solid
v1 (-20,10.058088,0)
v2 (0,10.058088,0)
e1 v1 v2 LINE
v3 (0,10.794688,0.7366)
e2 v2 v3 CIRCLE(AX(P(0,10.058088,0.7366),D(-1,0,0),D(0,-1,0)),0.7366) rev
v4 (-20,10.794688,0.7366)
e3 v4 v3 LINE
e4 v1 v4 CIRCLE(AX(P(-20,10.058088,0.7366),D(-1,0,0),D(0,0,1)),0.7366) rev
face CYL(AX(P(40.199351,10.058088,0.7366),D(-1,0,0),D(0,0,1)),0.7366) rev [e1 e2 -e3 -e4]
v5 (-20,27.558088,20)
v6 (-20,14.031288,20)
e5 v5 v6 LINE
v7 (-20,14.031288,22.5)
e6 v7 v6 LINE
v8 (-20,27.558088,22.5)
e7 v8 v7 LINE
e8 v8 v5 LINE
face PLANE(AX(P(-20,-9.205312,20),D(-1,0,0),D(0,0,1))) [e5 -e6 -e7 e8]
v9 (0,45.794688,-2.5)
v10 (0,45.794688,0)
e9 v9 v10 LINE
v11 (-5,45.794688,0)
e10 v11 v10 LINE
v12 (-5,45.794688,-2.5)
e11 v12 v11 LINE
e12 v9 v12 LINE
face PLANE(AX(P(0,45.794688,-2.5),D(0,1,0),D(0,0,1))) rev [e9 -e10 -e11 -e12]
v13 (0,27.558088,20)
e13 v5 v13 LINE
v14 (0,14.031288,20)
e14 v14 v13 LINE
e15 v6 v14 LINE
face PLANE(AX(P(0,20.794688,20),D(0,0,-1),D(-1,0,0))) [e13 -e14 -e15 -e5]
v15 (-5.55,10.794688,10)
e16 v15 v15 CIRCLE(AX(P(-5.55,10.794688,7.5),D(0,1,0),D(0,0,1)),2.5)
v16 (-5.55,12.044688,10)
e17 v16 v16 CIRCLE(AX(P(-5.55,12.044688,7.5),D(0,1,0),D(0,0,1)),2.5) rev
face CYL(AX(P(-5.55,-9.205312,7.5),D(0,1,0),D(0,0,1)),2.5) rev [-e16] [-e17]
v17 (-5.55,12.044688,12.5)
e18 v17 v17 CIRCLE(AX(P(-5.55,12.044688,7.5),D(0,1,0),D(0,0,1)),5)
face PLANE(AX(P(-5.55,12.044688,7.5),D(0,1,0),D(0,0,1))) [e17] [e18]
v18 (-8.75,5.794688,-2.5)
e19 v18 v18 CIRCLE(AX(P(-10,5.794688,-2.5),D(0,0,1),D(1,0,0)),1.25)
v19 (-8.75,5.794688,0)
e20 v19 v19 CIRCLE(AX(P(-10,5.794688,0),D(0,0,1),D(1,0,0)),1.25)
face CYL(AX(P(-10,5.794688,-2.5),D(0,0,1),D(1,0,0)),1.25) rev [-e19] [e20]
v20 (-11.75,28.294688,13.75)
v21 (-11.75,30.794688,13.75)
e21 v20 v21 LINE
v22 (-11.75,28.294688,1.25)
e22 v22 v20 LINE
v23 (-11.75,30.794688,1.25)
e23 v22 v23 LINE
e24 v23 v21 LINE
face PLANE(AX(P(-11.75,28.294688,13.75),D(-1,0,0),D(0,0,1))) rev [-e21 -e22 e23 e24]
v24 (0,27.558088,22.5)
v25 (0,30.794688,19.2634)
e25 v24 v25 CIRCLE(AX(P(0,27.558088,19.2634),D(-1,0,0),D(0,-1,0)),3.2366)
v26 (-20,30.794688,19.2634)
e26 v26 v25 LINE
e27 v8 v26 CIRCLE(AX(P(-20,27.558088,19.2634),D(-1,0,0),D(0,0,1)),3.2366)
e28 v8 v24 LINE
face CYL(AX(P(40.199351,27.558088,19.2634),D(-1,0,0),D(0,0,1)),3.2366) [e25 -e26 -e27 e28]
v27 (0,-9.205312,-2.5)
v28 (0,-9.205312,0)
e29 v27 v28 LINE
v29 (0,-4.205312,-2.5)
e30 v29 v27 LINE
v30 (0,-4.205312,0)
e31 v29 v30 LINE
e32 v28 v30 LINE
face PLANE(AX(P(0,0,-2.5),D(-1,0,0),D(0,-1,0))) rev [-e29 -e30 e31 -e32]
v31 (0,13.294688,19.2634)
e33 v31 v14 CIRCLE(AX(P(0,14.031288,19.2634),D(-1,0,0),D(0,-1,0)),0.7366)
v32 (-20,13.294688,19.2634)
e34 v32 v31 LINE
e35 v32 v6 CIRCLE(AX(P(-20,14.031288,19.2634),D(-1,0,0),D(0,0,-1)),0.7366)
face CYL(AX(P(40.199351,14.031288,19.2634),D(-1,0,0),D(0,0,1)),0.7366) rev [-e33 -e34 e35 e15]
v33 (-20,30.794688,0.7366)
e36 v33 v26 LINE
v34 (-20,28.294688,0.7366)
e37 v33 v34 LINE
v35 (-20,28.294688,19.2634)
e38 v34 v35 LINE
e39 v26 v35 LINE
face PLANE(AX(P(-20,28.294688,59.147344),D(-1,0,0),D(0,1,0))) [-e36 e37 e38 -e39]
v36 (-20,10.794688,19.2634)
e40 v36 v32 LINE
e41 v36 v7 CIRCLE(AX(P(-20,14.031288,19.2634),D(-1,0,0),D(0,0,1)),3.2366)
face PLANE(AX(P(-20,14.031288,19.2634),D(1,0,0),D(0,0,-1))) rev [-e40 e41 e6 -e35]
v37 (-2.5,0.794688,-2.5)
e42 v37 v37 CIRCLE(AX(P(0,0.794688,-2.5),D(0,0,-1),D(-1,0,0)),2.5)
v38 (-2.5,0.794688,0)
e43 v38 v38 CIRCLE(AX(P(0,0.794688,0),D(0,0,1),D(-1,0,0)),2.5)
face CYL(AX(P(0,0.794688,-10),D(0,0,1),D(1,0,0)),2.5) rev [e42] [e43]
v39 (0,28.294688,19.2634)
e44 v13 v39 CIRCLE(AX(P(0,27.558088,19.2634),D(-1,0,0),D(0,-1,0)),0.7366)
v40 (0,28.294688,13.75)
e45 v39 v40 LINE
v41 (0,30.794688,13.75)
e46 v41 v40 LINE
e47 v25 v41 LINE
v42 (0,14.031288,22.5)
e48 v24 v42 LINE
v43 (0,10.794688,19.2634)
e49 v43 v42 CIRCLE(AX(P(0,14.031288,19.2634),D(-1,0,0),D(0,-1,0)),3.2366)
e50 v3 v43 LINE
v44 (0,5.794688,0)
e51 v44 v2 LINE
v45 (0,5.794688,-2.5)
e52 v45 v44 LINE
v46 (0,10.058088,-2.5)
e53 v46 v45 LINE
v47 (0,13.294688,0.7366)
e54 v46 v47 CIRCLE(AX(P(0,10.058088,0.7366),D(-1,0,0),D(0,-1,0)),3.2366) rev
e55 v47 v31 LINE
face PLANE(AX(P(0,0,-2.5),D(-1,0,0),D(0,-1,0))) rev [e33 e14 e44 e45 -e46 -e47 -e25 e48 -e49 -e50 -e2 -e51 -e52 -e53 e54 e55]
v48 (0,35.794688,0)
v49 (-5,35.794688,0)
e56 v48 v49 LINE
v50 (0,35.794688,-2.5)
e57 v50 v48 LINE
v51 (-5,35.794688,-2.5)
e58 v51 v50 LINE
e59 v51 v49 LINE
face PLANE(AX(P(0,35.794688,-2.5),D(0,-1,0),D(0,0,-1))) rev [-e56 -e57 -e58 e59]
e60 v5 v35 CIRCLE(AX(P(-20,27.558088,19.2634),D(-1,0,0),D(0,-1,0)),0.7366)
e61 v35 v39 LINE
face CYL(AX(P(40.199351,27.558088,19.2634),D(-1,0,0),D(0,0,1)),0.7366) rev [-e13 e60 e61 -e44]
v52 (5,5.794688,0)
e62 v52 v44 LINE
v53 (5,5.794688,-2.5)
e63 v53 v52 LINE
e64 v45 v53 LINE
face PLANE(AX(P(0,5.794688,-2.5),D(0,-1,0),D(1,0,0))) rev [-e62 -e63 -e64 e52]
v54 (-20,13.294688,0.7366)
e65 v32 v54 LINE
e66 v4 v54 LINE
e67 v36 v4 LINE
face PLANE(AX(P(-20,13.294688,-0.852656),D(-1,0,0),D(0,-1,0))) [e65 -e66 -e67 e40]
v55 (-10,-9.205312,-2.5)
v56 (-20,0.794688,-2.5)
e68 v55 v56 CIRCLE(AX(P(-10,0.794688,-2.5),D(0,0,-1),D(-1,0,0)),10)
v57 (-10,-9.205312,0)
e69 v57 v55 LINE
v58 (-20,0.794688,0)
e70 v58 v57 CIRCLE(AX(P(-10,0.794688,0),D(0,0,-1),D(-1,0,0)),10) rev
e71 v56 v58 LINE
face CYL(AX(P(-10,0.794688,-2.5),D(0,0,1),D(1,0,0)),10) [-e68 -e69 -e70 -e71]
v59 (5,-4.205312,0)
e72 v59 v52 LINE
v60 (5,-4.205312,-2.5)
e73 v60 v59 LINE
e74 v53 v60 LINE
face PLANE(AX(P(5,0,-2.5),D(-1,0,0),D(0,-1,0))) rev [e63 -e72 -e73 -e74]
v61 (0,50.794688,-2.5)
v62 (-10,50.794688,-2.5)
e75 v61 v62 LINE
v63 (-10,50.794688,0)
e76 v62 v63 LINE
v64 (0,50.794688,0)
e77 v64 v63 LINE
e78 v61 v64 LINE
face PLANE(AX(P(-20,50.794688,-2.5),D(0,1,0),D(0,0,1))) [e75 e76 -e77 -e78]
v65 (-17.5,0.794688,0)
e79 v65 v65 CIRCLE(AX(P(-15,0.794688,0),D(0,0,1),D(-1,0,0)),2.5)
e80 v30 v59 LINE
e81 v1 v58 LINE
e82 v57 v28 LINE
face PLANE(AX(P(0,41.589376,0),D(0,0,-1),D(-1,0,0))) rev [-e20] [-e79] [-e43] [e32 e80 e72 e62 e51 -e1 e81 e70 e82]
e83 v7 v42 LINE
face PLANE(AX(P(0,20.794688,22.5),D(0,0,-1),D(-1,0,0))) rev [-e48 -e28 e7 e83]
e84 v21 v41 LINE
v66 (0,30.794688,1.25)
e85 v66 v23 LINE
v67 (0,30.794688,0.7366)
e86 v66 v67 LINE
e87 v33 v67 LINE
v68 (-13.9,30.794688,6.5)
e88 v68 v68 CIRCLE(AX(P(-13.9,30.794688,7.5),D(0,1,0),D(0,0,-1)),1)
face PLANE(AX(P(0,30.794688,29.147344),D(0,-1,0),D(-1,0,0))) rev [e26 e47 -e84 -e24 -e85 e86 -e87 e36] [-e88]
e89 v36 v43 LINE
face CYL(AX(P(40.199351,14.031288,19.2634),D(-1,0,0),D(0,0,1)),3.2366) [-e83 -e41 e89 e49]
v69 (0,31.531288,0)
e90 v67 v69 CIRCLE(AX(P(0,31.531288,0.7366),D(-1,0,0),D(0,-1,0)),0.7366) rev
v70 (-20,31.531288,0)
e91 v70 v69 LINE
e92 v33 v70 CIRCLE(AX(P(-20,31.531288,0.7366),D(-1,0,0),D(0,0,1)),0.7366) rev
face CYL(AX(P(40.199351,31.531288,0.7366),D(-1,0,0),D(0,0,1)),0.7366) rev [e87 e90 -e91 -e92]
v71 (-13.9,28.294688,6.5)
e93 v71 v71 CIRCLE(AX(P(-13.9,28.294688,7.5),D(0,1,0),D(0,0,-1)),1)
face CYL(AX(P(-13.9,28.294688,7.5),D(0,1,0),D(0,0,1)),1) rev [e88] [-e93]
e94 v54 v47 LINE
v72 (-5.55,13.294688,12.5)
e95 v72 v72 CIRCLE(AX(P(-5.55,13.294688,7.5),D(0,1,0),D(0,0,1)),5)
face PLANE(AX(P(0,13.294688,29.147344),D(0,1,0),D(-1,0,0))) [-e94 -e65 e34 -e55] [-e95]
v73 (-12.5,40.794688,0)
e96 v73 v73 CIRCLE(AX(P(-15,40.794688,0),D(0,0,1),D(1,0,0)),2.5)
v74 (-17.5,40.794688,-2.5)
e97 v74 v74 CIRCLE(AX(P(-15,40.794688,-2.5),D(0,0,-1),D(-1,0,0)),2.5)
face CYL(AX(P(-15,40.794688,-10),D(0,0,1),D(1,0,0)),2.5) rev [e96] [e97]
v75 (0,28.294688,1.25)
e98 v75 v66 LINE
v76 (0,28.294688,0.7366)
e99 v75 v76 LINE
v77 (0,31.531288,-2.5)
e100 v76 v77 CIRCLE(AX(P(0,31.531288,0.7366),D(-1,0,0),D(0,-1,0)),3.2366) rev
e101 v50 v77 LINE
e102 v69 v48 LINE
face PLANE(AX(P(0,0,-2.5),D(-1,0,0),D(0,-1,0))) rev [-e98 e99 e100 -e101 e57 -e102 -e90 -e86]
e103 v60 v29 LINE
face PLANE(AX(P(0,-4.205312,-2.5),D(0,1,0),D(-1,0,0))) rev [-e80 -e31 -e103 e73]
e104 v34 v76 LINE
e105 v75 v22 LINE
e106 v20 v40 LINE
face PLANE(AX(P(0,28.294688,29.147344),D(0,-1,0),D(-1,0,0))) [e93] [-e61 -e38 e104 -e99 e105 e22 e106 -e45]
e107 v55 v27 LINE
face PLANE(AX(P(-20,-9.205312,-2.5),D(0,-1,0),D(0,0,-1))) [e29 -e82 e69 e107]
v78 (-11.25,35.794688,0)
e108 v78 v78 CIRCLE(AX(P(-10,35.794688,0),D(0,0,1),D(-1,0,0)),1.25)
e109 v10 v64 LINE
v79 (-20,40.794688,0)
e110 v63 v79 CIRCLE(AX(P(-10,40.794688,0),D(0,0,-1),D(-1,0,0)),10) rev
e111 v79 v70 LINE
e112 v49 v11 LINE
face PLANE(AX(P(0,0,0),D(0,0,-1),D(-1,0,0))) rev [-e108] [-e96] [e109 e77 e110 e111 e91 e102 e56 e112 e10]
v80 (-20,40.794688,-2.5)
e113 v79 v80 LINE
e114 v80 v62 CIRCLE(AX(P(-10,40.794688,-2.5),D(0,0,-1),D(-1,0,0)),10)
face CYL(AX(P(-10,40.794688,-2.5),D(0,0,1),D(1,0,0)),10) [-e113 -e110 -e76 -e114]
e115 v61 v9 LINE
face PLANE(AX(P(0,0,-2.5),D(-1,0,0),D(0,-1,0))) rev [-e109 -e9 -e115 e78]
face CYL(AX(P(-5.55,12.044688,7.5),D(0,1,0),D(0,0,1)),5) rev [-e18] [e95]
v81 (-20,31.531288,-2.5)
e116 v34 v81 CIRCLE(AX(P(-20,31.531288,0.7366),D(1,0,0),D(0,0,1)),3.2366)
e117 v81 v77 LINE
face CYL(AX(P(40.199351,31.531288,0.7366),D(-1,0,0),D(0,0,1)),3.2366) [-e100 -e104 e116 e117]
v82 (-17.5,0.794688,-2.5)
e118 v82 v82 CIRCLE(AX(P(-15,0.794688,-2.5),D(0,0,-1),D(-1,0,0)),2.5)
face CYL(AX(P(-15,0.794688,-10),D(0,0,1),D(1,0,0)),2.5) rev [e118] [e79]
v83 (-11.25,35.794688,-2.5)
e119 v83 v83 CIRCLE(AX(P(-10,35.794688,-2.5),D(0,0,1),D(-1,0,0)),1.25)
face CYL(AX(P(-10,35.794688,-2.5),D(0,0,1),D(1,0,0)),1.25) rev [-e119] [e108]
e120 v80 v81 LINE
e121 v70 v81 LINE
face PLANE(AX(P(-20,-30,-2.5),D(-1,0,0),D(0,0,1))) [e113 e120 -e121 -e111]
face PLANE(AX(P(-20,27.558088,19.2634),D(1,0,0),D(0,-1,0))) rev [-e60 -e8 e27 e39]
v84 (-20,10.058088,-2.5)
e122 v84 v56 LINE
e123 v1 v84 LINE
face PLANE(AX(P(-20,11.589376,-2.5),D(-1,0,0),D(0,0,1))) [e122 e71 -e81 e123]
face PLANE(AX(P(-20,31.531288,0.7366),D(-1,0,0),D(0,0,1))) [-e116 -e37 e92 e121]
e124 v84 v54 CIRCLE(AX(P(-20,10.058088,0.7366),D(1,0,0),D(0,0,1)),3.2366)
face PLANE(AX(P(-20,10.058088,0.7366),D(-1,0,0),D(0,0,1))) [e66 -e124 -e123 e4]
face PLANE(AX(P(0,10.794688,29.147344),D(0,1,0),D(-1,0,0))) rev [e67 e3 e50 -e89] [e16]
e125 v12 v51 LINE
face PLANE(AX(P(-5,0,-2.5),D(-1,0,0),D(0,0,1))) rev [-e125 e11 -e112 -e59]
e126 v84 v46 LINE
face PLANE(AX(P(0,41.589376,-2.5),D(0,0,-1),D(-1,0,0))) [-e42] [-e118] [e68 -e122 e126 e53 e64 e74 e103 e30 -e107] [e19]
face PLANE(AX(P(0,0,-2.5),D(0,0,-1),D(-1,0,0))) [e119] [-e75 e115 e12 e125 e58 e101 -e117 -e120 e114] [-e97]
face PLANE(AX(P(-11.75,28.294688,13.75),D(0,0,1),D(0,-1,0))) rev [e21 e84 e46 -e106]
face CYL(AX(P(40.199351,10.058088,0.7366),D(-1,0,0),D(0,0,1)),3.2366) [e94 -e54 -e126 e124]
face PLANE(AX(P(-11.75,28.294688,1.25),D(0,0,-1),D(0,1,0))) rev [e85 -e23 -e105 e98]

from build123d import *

# Parameters (mm, degrees)
SKETCH1_W           = 40
SKETCH1_H           = 60
SKETCH1_R           = 1.25
BASE_FLANGE1_DEPTH  = 2.5
SKETCH15_R          = 1
CUT_EXTRUDE3_DEPTH  = 10
JOG3_START          = -2.5
JOG3_OUTLINE_W      = 40
JOG3_OUTLINE_H      = 58.294687966
JOG3_OUTLINE_R      = 1
JOG3_OUTLINE_R_2    = 1.25
JOG3_DEPTH          = 2.5
JOG3_2_OUTLINE_W    = 40
JOG3_2_OUTLINE_H    = 1.705312034
JOG3_2_DEPTH        = 0.332528284
JOG3_START_2        = 19.2634
JOG3_3_OUTLINE_W    = 40
JOG3_3_OUTLINE_H    = 40
JOG3_3_OUTLINE_R    = 1
JOG3_3_OUTLINE_R_2  = 1.25
JOG3_3_DEPTH        = 3.2366
JOG3_4_OUTLINE_W    = 40
JOG3_4_OUTLINE_H    = 20.794687966
JOG3_4_OUTLINE_R    = 1.25
JOG3_4_DEPTH        = 3.2366
JOG3_5_OUTLINE_W    = 40
JOG3_5_OUTLINE_H    = 2.5
JOG3_5_DEPTH        = 20
JOG3_START_3        = 20
JOG3_6_OUTLINE_R    = 1.25
JOG3_6_OUTLINE_R_2  = 1
JOG3_6_DEPTH        = 2.5
JOG3_START_4        = -20
JOG3_7_DEPTH        = 40
JOG4_START          = -20
JOG4_DEPTH          = 40
JOG4_2_DEPTH        = 40
JOG4_START_2        = -3
JOG4_3_OUTLINE_R    = 1.25
JOG4_3_DEPTH        = 4
FILLET1_R           = 10
SKETCH18_R          = 2.5
BOSS_EXTRUDE1_DEPTH = 2.5
SKETCH19_R          = 1
SKETCH19_W          = 23.5
SKETCH19_H          = 12.5
CUT_EXTRUDE4_DEPTH  = 2.5
SKETCH20_R          = 2.5
CUT_EXTRUDE6_DEPTH  = 10
SKETCH23_R          = 2.5
CUT_EXTRUDE7_DEPTH  = 51.062460986
SKETCH24_R          = 5
CUT_EXTRUDE8_DEPTH  = 1.25
SKETCH26_R          = 2.5
CUT_EXTRUDE12_DEPTH = 51.062460987
SKETCH27_W          = 20
SKETCH27_H          = 13.5268
CUT_EXTRUDE13_DEPTH = 61.042487703


with BuildPart() as part:
    # Base-Flange1: sheet metal written as solids
    # Sketch1 → Base-Flange1 (new body)
    with BuildSketch(Plane.XY):
        Rectangle(SKETCH1_W, SKETCH1_H)
        with Locations((10, 15)):
            Circle(SKETCH1_R, mode=Mode.SUBTRACT)
        with Locations(Location((10, -15, 0), (0, 0, 180))):
            Circle(SKETCH1_R, mode=Mode.SUBTRACT)
        with Locations((-10, -15)):
            Circle(SKETCH1_R, mode=Mode.SUBTRACT)
        with Locations(Location((-10, 15, 0), (0, 0, 180))):
            Circle(SKETCH1_R, mode=Mode.SUBTRACT)
    extrude(amount=-BASE_FLANGE1_DEPTH)

    # Sketch15 → Cut-Extrude3 (cut)
    with BuildSketch(Plane.XY):
        with Locations((12, 0)):
            Circle(SKETCH15_R)
        with Locations(Location((-17, 0, 0), (0, 0, 180))):
            Circle(SKETCH15_R)
    extrude(amount=-CUT_EXTRUDE3_DEPTH, mode=Mode.SUBTRACT)

    # Jog3: read off the stored shape, not the designer's step
    # Jog3 outline → Jog3 (cut)
    with BuildSketch(Plane.XY.offset(JOG3_START)):
        with Locations((0, -0.852656017)):
            Rectangle(JOG3_OUTLINE_W, JOG3_OUTLINE_H)
        with Locations((-17, 0)):
            Circle(JOG3_OUTLINE_R, mode=Mode.SUBTRACT)
        with Locations((12, 0)):
            Circle(JOG3_OUTLINE_R, mode=Mode.SUBTRACT)
        with Locations((-10, 15)):
            Circle(JOG3_OUTLINE_R_2, mode=Mode.SUBTRACT)
        with Locations((10, 15)):
            Circle(JOG3_OUTLINE_R_2, mode=Mode.SUBTRACT)
        with Locations((10, -15)):
            Circle(JOG3_OUTLINE_R_2, mode=Mode.SUBTRACT)
        with Locations((-10, -15)):
            Circle(JOG3_OUTLINE_R_2, mode=Mode.SUBTRACT)
    extrude(amount=JOG3_DEPTH, mode=Mode.SUBTRACT)

    # Jog3 2 outline → Jog3 2 (cut)
    with BuildSketch(Plane.XY.offset(JOG3_START)):
        with Locations((0, 29.147343983)):
            Rectangle(JOG3_2_OUTLINE_W, JOG3_2_OUTLINE_H)
    extrude(amount=JOG3_2_DEPTH, mode=Mode.SUBTRACT)

    # Jog3 4 outline → Jog3 4 (add)
    with BuildSketch(Plane.XY.offset(JOG3_START)):
        with Locations((0, 40.397343983)):
            Rectangle(JOG3_4_OUTLINE_W, JOG3_4_OUTLINE_H)
        with Locations((10, 35.794687966)):
            Circle(JOG3_4_OUTLINE_R, mode=Mode.SUBTRACT)
        with Locations((-10, 35.794687966)):
            Circle(JOG3_4_OUTLINE_R, mode=Mode.SUBTRACT)
    extrude(amount=JOG3_4_DEPTH)



with BuildPart() as body_2:
    # Jog3 3 outline → Jog3 3 (new body)
    with BuildSketch(Plane.XY.offset(JOG3_START_2)):
        with Locations((0, 10.794687966)):
            Rectangle(JOG3_3_OUTLINE_W, JOG3_3_OUTLINE_H)
        with Locations((12, 20.794687966)):
            Circle(JOG3_3_OUTLINE_R, mode=Mode.SUBTRACT)
        with Locations((-17, 0)):
            Circle(JOG3_3_OUTLINE_R, mode=Mode.SUBTRACT)
        with Locations((-10, 5.794687966)):
            Circle(JOG3_3_OUTLINE_R_2, mode=Mode.SUBTRACT)
        with Locations((12, 0)):
            Circle(JOG3_3_OUTLINE_R, mode=Mode.SUBTRACT)
        with Locations((10, 5.794687966)):
            Circle(JOG3_3_OUTLINE_R_2, mode=Mode.SUBTRACT)
        with Locations((-17, 20.794687966)):
            Circle(JOG3_3_OUTLINE_R, mode=Mode.SUBTRACT)
        with Locations((-10, 15)):
            Circle(JOG3_3_OUTLINE_R_2, mode=Mode.SUBTRACT)
        with Locations((10, 15)):
            Circle(JOG3_3_OUTLINE_R_2, mode=Mode.SUBTRACT)
    extrude(amount=JOG3_3_DEPTH)


with BuildPart() as part_1:
    add(part.part)

    add(body_2.part)  # Jog3 5 merges body 2
    # Jog3 5 outline → Jog3 5 (add)
    with BuildSketch(Plane.XY):
        with Locations((0, 29.544687966)):
            Rectangle(JOG3_5_OUTLINE_W, JOG3_5_OUTLINE_H)
    extrude(amount=JOG3_5_DEPTH)

    # Jog3 6 outline → Jog3 6 (add)
    with BuildSketch(Plane.XY.offset(JOG3_START_3)):
        with Locations((10, 15)):
            Circle(JOG3_6_OUTLINE_R)
        with Locations((-10, 15)):
            Circle(JOG3_6_OUTLINE_R)
        with Locations((12, 0)):
            Circle(JOG3_6_OUTLINE_R_2)
        with Locations((-17, 0)):
            Circle(JOG3_6_OUTLINE_R_2)
    extrude(amount=JOG3_6_DEPTH)

    # Jog3 7 outline → Jog3 7 (cut)
    with BuildSketch(Plane.YZ.offset(JOG3_START_4)):
        with BuildLine():
            ThreePointArc((28.294687966, 19.2634), (28.078942821, 19.784254855), (27.558087966, 20))
            Line((27.558087966, 20), (-9.205312034, 20))
            Line((-9.205312034, 20), (-9.205312034, 19.2634))
            Line((-9.205312034, 19.2634), (28.294687966, 19.2634))
        make_face()
        with BuildLine():
            ThreePointArc((31.531287966, -2.5), (29.242666158, -1.552021808), (28.294687966, 0.7366))
            Line((28.294687966, 0.7366), (28.294687966, -2.167471716))
            Line((28.294687966, -2.167471716), (30, -2.167471716))
            Line((30, -2.167471716), (30, -2.5))
            Line((30, -2.5), (31.531287966, -2.5))
        make_face()
        with BuildLine():
            Line((31.531287966, 0), (50.794687966, 0))
            Line((50.794687966, 0), (50.794687966, 0.7366))
            Line((50.794687966, 0.7366), (30.794687966, 0.7366))
            ThreePointArc((30.794687966, 0.7366), (31.010433111, 0.215745145), (31.531287966, 0))
        make_face()
        with BuildLine():
            Line((30.794687966, 22.5), (27.558087966, 22.5))
            ThreePointArc((27.558087966, 22.5), (29.846709774, 21.552021808), (30.794687966, 19.2634))
            Line((30.794687966, 19.2634), (30.794687966, 22.5))
        make_face()
    extrude(amount=JOG3_7_DEPTH, mode=Mode.SUBTRACT)

    # Jog4: read off the stored shape, not the designer's step
    # Jog4 outline → Jog4 (cut)
    with BuildSketch(Plane.YZ.offset(JOG4_START)):
        with BuildLine():
            Line((-9.205312034, 20), (10.87962174, 20))
            ThreePointArc((10.87962174, 20), (12.019882984, 21.799110859), (14.031287966, 22.5))
            Line((14.031287966, 22.5), (-9.205312034, 22.5))
            Line((-9.205312034, 22.5), (-9.205312034, 20))
        make_face()
    extrude(amount=JOG4_DEPTH, mode=Mode.SUBTRACT)

    # Jog4 2 outline → Jog4 2 (add)
    with BuildSketch(Plane.YZ.offset(JOG4_START)):
        with BuildLine():
            Line((-9.205312034, 0), (-9.205312034, -2.5))
            Line((-9.205312034, -2.5), (10.058087966, -2.5))
            ThreePointArc((10.058087966, -2.5), (12.346709774, -1.552021808), (13.294687966, 0.7366))
            Line((13.294687966, 0.7366), (13.294687966, 19.2634))
            ThreePointArc((13.294687966, 19.2634), (13.510433111, 19.784254855), (14.031287966, 20))
            Line((14.031287966, 20), (10.87962174, 20))
            ThreePointArc((10.87962174, 20), (10.81599152, 19.634140241), (10.794687966, 19.2634))
            Line((10.794687966, 19.2634), (10.794687966, 0.7366))
            ThreePointArc((10.794687966, 0.7366), (10.578942821, 0.215745145), (10.058087966, 0))
            Line((10.058087966, 0), (-9.205312034, 0))
        make_face()
    extrude(amount=JOG4_2_DEPTH)

    # Jog4 3 outline → Jog4 3 (cut)
    with BuildSketch(Plane.XY.offset(JOG4_START_2)):
        with Locations((-10, 5.794687966)):
            Circle(JOG4_3_OUTLINE_R)
        with Locations((10, 5.794687966)):
            Circle(JOG4_3_OUTLINE_R)
    extrude(amount=JOG4_3_DEPTH, mode=Mode.SUBTRACT)

    # Fillet1
    fillet1_edges = [part_1.edges().sort_by_distance(p)[0] for p in [
        (20, -9.205312034, -1.25),
        (-20, -9.205312034, -1.25),
        (-20, 50.794687966, -1.25),
        (20, 50.794687966, -1.25),
    ]]
    fillet(fillet1_edges, radius=FILLET1_R)

    # Sketch18 → Boss-Extrude1 (add)
    with BuildSketch(Plane.XY.offset(22.5)):
        with Locations((12, 20.794687966)):
            Circle(SKETCH18_R)
        with Locations((-17, 20.794687966)):
            Circle(SKETCH18_R)
    extrude(amount=-BOSS_EXTRUDE1_DEPTH)

    # Sketch19 → Cut-Extrude4 (cut)
    with BuildSketch(Plane(origin=(0, 30.794687966, 0), x_dir=(1, 0, 0), z_dir=(0, 1, 0))):
        with Locations(Location((13.9, -7.5, 0), (0, 0, 270))):
            Circle(SKETCH19_R)
        with Locations(Location((-13.9, -7.5, 0), (0, 0, 90))):
            Circle(SKETCH19_R)
        with Locations((0, -7.5)):
            Rectangle(SKETCH19_W, SKETCH19_H)
    extrude(amount=-CUT_EXTRUDE4_DEPTH, mode=Mode.SUBTRACT)

    # Sketch20 → Cut-Extrude6 (cut)
    with BuildSketch(Plane.XY):
        with Locations((0, 40.794687966)):
            Circle(SKETCH20_R)
        with Locations(Location((0, 0.794687966, 0), (0, 0, 180))):
            Circle(SKETCH20_R)
        with Locations((15, 0.794687966)):
            Circle(SKETCH20_R)
        with Locations(Location((-15, 0.794687966, 0), (0, 0, 180))):
            Circle(SKETCH20_R)
        with Locations(Location((15, 40.794687966, 0), (0, 0, 180))):
            Circle(SKETCH20_R)
        with Locations((-15, 40.794687966)):
            Circle(SKETCH20_R)
    extrude(amount=-CUT_EXTRUDE6_DEPTH, mode=Mode.SUBTRACT)

    # Sketch23 → Cut-Extrude7 (cut, through all)
    with BuildSketch(Plane(origin=(0, 30.794687966, 0), x_dir=(1, 0, 0), z_dir=(0, 1, 0))):
        with Locations(Location((-5.55, -7.5, 0), (0, 0, 270))):
            Circle(SKETCH23_R)
    extrude(amount=-CUT_EXTRUDE7_DEPTH, mode=Mode.SUBTRACT)

    # Sketch24 → Cut-Extrude8 (cut)
    with BuildSketch(Plane(origin=(0, 13.294687966, 0), x_dir=(1, 0, 0), z_dir=(0, 1, 0))):
        with Locations(Location((-5.55, -7.5, 0), (0, 0, 270))):
            Circle(SKETCH24_R)
    extrude(amount=-CUT_EXTRUDE8_DEPTH, mode=Mode.SUBTRACT)

    # Sketch26 → Cut-Extrude12 (cut, through all)
    with BuildSketch(Plane.XZ.offset(-10.794687966)):
        with Locations(Location((9.45, 17.5, 0), (0, 0, 135.141364755))):
            Circle(SKETCH26_R)
    extrude(amount=-CUT_EXTRUDE12_DEPTH, mode=Mode.SUBTRACT)

    # Sketch27 → Cut-Extrude13 (cut, through all)
    with BuildSketch(Plane.XY.offset(22.5)):
        Polygon((20, 50.794687966), (0, 50.794687966), (0, 45.794687966), (-5, 45.794687966), (-5, 35.794687966), (0, 35.794687966), (0, 27.558087966), (20, 27.558087966), align=None)
        with Locations((10, 20.794687966)):
            Rectangle(SKETCH27_W, SKETCH27_H)
        Polygon((20, -9.205312034), (20, 14.031287966), (0, 14.031287966), (0, 5.794687966), (5, 5.794687966), (5, -4.205312034), (0, -4.205312034), (0, -9.205312034), align=None)
    extrude(amount=-CUT_EXTRUDE13_DEPTH, mode=Mode.SUBTRACT)


solid = part_1.part
